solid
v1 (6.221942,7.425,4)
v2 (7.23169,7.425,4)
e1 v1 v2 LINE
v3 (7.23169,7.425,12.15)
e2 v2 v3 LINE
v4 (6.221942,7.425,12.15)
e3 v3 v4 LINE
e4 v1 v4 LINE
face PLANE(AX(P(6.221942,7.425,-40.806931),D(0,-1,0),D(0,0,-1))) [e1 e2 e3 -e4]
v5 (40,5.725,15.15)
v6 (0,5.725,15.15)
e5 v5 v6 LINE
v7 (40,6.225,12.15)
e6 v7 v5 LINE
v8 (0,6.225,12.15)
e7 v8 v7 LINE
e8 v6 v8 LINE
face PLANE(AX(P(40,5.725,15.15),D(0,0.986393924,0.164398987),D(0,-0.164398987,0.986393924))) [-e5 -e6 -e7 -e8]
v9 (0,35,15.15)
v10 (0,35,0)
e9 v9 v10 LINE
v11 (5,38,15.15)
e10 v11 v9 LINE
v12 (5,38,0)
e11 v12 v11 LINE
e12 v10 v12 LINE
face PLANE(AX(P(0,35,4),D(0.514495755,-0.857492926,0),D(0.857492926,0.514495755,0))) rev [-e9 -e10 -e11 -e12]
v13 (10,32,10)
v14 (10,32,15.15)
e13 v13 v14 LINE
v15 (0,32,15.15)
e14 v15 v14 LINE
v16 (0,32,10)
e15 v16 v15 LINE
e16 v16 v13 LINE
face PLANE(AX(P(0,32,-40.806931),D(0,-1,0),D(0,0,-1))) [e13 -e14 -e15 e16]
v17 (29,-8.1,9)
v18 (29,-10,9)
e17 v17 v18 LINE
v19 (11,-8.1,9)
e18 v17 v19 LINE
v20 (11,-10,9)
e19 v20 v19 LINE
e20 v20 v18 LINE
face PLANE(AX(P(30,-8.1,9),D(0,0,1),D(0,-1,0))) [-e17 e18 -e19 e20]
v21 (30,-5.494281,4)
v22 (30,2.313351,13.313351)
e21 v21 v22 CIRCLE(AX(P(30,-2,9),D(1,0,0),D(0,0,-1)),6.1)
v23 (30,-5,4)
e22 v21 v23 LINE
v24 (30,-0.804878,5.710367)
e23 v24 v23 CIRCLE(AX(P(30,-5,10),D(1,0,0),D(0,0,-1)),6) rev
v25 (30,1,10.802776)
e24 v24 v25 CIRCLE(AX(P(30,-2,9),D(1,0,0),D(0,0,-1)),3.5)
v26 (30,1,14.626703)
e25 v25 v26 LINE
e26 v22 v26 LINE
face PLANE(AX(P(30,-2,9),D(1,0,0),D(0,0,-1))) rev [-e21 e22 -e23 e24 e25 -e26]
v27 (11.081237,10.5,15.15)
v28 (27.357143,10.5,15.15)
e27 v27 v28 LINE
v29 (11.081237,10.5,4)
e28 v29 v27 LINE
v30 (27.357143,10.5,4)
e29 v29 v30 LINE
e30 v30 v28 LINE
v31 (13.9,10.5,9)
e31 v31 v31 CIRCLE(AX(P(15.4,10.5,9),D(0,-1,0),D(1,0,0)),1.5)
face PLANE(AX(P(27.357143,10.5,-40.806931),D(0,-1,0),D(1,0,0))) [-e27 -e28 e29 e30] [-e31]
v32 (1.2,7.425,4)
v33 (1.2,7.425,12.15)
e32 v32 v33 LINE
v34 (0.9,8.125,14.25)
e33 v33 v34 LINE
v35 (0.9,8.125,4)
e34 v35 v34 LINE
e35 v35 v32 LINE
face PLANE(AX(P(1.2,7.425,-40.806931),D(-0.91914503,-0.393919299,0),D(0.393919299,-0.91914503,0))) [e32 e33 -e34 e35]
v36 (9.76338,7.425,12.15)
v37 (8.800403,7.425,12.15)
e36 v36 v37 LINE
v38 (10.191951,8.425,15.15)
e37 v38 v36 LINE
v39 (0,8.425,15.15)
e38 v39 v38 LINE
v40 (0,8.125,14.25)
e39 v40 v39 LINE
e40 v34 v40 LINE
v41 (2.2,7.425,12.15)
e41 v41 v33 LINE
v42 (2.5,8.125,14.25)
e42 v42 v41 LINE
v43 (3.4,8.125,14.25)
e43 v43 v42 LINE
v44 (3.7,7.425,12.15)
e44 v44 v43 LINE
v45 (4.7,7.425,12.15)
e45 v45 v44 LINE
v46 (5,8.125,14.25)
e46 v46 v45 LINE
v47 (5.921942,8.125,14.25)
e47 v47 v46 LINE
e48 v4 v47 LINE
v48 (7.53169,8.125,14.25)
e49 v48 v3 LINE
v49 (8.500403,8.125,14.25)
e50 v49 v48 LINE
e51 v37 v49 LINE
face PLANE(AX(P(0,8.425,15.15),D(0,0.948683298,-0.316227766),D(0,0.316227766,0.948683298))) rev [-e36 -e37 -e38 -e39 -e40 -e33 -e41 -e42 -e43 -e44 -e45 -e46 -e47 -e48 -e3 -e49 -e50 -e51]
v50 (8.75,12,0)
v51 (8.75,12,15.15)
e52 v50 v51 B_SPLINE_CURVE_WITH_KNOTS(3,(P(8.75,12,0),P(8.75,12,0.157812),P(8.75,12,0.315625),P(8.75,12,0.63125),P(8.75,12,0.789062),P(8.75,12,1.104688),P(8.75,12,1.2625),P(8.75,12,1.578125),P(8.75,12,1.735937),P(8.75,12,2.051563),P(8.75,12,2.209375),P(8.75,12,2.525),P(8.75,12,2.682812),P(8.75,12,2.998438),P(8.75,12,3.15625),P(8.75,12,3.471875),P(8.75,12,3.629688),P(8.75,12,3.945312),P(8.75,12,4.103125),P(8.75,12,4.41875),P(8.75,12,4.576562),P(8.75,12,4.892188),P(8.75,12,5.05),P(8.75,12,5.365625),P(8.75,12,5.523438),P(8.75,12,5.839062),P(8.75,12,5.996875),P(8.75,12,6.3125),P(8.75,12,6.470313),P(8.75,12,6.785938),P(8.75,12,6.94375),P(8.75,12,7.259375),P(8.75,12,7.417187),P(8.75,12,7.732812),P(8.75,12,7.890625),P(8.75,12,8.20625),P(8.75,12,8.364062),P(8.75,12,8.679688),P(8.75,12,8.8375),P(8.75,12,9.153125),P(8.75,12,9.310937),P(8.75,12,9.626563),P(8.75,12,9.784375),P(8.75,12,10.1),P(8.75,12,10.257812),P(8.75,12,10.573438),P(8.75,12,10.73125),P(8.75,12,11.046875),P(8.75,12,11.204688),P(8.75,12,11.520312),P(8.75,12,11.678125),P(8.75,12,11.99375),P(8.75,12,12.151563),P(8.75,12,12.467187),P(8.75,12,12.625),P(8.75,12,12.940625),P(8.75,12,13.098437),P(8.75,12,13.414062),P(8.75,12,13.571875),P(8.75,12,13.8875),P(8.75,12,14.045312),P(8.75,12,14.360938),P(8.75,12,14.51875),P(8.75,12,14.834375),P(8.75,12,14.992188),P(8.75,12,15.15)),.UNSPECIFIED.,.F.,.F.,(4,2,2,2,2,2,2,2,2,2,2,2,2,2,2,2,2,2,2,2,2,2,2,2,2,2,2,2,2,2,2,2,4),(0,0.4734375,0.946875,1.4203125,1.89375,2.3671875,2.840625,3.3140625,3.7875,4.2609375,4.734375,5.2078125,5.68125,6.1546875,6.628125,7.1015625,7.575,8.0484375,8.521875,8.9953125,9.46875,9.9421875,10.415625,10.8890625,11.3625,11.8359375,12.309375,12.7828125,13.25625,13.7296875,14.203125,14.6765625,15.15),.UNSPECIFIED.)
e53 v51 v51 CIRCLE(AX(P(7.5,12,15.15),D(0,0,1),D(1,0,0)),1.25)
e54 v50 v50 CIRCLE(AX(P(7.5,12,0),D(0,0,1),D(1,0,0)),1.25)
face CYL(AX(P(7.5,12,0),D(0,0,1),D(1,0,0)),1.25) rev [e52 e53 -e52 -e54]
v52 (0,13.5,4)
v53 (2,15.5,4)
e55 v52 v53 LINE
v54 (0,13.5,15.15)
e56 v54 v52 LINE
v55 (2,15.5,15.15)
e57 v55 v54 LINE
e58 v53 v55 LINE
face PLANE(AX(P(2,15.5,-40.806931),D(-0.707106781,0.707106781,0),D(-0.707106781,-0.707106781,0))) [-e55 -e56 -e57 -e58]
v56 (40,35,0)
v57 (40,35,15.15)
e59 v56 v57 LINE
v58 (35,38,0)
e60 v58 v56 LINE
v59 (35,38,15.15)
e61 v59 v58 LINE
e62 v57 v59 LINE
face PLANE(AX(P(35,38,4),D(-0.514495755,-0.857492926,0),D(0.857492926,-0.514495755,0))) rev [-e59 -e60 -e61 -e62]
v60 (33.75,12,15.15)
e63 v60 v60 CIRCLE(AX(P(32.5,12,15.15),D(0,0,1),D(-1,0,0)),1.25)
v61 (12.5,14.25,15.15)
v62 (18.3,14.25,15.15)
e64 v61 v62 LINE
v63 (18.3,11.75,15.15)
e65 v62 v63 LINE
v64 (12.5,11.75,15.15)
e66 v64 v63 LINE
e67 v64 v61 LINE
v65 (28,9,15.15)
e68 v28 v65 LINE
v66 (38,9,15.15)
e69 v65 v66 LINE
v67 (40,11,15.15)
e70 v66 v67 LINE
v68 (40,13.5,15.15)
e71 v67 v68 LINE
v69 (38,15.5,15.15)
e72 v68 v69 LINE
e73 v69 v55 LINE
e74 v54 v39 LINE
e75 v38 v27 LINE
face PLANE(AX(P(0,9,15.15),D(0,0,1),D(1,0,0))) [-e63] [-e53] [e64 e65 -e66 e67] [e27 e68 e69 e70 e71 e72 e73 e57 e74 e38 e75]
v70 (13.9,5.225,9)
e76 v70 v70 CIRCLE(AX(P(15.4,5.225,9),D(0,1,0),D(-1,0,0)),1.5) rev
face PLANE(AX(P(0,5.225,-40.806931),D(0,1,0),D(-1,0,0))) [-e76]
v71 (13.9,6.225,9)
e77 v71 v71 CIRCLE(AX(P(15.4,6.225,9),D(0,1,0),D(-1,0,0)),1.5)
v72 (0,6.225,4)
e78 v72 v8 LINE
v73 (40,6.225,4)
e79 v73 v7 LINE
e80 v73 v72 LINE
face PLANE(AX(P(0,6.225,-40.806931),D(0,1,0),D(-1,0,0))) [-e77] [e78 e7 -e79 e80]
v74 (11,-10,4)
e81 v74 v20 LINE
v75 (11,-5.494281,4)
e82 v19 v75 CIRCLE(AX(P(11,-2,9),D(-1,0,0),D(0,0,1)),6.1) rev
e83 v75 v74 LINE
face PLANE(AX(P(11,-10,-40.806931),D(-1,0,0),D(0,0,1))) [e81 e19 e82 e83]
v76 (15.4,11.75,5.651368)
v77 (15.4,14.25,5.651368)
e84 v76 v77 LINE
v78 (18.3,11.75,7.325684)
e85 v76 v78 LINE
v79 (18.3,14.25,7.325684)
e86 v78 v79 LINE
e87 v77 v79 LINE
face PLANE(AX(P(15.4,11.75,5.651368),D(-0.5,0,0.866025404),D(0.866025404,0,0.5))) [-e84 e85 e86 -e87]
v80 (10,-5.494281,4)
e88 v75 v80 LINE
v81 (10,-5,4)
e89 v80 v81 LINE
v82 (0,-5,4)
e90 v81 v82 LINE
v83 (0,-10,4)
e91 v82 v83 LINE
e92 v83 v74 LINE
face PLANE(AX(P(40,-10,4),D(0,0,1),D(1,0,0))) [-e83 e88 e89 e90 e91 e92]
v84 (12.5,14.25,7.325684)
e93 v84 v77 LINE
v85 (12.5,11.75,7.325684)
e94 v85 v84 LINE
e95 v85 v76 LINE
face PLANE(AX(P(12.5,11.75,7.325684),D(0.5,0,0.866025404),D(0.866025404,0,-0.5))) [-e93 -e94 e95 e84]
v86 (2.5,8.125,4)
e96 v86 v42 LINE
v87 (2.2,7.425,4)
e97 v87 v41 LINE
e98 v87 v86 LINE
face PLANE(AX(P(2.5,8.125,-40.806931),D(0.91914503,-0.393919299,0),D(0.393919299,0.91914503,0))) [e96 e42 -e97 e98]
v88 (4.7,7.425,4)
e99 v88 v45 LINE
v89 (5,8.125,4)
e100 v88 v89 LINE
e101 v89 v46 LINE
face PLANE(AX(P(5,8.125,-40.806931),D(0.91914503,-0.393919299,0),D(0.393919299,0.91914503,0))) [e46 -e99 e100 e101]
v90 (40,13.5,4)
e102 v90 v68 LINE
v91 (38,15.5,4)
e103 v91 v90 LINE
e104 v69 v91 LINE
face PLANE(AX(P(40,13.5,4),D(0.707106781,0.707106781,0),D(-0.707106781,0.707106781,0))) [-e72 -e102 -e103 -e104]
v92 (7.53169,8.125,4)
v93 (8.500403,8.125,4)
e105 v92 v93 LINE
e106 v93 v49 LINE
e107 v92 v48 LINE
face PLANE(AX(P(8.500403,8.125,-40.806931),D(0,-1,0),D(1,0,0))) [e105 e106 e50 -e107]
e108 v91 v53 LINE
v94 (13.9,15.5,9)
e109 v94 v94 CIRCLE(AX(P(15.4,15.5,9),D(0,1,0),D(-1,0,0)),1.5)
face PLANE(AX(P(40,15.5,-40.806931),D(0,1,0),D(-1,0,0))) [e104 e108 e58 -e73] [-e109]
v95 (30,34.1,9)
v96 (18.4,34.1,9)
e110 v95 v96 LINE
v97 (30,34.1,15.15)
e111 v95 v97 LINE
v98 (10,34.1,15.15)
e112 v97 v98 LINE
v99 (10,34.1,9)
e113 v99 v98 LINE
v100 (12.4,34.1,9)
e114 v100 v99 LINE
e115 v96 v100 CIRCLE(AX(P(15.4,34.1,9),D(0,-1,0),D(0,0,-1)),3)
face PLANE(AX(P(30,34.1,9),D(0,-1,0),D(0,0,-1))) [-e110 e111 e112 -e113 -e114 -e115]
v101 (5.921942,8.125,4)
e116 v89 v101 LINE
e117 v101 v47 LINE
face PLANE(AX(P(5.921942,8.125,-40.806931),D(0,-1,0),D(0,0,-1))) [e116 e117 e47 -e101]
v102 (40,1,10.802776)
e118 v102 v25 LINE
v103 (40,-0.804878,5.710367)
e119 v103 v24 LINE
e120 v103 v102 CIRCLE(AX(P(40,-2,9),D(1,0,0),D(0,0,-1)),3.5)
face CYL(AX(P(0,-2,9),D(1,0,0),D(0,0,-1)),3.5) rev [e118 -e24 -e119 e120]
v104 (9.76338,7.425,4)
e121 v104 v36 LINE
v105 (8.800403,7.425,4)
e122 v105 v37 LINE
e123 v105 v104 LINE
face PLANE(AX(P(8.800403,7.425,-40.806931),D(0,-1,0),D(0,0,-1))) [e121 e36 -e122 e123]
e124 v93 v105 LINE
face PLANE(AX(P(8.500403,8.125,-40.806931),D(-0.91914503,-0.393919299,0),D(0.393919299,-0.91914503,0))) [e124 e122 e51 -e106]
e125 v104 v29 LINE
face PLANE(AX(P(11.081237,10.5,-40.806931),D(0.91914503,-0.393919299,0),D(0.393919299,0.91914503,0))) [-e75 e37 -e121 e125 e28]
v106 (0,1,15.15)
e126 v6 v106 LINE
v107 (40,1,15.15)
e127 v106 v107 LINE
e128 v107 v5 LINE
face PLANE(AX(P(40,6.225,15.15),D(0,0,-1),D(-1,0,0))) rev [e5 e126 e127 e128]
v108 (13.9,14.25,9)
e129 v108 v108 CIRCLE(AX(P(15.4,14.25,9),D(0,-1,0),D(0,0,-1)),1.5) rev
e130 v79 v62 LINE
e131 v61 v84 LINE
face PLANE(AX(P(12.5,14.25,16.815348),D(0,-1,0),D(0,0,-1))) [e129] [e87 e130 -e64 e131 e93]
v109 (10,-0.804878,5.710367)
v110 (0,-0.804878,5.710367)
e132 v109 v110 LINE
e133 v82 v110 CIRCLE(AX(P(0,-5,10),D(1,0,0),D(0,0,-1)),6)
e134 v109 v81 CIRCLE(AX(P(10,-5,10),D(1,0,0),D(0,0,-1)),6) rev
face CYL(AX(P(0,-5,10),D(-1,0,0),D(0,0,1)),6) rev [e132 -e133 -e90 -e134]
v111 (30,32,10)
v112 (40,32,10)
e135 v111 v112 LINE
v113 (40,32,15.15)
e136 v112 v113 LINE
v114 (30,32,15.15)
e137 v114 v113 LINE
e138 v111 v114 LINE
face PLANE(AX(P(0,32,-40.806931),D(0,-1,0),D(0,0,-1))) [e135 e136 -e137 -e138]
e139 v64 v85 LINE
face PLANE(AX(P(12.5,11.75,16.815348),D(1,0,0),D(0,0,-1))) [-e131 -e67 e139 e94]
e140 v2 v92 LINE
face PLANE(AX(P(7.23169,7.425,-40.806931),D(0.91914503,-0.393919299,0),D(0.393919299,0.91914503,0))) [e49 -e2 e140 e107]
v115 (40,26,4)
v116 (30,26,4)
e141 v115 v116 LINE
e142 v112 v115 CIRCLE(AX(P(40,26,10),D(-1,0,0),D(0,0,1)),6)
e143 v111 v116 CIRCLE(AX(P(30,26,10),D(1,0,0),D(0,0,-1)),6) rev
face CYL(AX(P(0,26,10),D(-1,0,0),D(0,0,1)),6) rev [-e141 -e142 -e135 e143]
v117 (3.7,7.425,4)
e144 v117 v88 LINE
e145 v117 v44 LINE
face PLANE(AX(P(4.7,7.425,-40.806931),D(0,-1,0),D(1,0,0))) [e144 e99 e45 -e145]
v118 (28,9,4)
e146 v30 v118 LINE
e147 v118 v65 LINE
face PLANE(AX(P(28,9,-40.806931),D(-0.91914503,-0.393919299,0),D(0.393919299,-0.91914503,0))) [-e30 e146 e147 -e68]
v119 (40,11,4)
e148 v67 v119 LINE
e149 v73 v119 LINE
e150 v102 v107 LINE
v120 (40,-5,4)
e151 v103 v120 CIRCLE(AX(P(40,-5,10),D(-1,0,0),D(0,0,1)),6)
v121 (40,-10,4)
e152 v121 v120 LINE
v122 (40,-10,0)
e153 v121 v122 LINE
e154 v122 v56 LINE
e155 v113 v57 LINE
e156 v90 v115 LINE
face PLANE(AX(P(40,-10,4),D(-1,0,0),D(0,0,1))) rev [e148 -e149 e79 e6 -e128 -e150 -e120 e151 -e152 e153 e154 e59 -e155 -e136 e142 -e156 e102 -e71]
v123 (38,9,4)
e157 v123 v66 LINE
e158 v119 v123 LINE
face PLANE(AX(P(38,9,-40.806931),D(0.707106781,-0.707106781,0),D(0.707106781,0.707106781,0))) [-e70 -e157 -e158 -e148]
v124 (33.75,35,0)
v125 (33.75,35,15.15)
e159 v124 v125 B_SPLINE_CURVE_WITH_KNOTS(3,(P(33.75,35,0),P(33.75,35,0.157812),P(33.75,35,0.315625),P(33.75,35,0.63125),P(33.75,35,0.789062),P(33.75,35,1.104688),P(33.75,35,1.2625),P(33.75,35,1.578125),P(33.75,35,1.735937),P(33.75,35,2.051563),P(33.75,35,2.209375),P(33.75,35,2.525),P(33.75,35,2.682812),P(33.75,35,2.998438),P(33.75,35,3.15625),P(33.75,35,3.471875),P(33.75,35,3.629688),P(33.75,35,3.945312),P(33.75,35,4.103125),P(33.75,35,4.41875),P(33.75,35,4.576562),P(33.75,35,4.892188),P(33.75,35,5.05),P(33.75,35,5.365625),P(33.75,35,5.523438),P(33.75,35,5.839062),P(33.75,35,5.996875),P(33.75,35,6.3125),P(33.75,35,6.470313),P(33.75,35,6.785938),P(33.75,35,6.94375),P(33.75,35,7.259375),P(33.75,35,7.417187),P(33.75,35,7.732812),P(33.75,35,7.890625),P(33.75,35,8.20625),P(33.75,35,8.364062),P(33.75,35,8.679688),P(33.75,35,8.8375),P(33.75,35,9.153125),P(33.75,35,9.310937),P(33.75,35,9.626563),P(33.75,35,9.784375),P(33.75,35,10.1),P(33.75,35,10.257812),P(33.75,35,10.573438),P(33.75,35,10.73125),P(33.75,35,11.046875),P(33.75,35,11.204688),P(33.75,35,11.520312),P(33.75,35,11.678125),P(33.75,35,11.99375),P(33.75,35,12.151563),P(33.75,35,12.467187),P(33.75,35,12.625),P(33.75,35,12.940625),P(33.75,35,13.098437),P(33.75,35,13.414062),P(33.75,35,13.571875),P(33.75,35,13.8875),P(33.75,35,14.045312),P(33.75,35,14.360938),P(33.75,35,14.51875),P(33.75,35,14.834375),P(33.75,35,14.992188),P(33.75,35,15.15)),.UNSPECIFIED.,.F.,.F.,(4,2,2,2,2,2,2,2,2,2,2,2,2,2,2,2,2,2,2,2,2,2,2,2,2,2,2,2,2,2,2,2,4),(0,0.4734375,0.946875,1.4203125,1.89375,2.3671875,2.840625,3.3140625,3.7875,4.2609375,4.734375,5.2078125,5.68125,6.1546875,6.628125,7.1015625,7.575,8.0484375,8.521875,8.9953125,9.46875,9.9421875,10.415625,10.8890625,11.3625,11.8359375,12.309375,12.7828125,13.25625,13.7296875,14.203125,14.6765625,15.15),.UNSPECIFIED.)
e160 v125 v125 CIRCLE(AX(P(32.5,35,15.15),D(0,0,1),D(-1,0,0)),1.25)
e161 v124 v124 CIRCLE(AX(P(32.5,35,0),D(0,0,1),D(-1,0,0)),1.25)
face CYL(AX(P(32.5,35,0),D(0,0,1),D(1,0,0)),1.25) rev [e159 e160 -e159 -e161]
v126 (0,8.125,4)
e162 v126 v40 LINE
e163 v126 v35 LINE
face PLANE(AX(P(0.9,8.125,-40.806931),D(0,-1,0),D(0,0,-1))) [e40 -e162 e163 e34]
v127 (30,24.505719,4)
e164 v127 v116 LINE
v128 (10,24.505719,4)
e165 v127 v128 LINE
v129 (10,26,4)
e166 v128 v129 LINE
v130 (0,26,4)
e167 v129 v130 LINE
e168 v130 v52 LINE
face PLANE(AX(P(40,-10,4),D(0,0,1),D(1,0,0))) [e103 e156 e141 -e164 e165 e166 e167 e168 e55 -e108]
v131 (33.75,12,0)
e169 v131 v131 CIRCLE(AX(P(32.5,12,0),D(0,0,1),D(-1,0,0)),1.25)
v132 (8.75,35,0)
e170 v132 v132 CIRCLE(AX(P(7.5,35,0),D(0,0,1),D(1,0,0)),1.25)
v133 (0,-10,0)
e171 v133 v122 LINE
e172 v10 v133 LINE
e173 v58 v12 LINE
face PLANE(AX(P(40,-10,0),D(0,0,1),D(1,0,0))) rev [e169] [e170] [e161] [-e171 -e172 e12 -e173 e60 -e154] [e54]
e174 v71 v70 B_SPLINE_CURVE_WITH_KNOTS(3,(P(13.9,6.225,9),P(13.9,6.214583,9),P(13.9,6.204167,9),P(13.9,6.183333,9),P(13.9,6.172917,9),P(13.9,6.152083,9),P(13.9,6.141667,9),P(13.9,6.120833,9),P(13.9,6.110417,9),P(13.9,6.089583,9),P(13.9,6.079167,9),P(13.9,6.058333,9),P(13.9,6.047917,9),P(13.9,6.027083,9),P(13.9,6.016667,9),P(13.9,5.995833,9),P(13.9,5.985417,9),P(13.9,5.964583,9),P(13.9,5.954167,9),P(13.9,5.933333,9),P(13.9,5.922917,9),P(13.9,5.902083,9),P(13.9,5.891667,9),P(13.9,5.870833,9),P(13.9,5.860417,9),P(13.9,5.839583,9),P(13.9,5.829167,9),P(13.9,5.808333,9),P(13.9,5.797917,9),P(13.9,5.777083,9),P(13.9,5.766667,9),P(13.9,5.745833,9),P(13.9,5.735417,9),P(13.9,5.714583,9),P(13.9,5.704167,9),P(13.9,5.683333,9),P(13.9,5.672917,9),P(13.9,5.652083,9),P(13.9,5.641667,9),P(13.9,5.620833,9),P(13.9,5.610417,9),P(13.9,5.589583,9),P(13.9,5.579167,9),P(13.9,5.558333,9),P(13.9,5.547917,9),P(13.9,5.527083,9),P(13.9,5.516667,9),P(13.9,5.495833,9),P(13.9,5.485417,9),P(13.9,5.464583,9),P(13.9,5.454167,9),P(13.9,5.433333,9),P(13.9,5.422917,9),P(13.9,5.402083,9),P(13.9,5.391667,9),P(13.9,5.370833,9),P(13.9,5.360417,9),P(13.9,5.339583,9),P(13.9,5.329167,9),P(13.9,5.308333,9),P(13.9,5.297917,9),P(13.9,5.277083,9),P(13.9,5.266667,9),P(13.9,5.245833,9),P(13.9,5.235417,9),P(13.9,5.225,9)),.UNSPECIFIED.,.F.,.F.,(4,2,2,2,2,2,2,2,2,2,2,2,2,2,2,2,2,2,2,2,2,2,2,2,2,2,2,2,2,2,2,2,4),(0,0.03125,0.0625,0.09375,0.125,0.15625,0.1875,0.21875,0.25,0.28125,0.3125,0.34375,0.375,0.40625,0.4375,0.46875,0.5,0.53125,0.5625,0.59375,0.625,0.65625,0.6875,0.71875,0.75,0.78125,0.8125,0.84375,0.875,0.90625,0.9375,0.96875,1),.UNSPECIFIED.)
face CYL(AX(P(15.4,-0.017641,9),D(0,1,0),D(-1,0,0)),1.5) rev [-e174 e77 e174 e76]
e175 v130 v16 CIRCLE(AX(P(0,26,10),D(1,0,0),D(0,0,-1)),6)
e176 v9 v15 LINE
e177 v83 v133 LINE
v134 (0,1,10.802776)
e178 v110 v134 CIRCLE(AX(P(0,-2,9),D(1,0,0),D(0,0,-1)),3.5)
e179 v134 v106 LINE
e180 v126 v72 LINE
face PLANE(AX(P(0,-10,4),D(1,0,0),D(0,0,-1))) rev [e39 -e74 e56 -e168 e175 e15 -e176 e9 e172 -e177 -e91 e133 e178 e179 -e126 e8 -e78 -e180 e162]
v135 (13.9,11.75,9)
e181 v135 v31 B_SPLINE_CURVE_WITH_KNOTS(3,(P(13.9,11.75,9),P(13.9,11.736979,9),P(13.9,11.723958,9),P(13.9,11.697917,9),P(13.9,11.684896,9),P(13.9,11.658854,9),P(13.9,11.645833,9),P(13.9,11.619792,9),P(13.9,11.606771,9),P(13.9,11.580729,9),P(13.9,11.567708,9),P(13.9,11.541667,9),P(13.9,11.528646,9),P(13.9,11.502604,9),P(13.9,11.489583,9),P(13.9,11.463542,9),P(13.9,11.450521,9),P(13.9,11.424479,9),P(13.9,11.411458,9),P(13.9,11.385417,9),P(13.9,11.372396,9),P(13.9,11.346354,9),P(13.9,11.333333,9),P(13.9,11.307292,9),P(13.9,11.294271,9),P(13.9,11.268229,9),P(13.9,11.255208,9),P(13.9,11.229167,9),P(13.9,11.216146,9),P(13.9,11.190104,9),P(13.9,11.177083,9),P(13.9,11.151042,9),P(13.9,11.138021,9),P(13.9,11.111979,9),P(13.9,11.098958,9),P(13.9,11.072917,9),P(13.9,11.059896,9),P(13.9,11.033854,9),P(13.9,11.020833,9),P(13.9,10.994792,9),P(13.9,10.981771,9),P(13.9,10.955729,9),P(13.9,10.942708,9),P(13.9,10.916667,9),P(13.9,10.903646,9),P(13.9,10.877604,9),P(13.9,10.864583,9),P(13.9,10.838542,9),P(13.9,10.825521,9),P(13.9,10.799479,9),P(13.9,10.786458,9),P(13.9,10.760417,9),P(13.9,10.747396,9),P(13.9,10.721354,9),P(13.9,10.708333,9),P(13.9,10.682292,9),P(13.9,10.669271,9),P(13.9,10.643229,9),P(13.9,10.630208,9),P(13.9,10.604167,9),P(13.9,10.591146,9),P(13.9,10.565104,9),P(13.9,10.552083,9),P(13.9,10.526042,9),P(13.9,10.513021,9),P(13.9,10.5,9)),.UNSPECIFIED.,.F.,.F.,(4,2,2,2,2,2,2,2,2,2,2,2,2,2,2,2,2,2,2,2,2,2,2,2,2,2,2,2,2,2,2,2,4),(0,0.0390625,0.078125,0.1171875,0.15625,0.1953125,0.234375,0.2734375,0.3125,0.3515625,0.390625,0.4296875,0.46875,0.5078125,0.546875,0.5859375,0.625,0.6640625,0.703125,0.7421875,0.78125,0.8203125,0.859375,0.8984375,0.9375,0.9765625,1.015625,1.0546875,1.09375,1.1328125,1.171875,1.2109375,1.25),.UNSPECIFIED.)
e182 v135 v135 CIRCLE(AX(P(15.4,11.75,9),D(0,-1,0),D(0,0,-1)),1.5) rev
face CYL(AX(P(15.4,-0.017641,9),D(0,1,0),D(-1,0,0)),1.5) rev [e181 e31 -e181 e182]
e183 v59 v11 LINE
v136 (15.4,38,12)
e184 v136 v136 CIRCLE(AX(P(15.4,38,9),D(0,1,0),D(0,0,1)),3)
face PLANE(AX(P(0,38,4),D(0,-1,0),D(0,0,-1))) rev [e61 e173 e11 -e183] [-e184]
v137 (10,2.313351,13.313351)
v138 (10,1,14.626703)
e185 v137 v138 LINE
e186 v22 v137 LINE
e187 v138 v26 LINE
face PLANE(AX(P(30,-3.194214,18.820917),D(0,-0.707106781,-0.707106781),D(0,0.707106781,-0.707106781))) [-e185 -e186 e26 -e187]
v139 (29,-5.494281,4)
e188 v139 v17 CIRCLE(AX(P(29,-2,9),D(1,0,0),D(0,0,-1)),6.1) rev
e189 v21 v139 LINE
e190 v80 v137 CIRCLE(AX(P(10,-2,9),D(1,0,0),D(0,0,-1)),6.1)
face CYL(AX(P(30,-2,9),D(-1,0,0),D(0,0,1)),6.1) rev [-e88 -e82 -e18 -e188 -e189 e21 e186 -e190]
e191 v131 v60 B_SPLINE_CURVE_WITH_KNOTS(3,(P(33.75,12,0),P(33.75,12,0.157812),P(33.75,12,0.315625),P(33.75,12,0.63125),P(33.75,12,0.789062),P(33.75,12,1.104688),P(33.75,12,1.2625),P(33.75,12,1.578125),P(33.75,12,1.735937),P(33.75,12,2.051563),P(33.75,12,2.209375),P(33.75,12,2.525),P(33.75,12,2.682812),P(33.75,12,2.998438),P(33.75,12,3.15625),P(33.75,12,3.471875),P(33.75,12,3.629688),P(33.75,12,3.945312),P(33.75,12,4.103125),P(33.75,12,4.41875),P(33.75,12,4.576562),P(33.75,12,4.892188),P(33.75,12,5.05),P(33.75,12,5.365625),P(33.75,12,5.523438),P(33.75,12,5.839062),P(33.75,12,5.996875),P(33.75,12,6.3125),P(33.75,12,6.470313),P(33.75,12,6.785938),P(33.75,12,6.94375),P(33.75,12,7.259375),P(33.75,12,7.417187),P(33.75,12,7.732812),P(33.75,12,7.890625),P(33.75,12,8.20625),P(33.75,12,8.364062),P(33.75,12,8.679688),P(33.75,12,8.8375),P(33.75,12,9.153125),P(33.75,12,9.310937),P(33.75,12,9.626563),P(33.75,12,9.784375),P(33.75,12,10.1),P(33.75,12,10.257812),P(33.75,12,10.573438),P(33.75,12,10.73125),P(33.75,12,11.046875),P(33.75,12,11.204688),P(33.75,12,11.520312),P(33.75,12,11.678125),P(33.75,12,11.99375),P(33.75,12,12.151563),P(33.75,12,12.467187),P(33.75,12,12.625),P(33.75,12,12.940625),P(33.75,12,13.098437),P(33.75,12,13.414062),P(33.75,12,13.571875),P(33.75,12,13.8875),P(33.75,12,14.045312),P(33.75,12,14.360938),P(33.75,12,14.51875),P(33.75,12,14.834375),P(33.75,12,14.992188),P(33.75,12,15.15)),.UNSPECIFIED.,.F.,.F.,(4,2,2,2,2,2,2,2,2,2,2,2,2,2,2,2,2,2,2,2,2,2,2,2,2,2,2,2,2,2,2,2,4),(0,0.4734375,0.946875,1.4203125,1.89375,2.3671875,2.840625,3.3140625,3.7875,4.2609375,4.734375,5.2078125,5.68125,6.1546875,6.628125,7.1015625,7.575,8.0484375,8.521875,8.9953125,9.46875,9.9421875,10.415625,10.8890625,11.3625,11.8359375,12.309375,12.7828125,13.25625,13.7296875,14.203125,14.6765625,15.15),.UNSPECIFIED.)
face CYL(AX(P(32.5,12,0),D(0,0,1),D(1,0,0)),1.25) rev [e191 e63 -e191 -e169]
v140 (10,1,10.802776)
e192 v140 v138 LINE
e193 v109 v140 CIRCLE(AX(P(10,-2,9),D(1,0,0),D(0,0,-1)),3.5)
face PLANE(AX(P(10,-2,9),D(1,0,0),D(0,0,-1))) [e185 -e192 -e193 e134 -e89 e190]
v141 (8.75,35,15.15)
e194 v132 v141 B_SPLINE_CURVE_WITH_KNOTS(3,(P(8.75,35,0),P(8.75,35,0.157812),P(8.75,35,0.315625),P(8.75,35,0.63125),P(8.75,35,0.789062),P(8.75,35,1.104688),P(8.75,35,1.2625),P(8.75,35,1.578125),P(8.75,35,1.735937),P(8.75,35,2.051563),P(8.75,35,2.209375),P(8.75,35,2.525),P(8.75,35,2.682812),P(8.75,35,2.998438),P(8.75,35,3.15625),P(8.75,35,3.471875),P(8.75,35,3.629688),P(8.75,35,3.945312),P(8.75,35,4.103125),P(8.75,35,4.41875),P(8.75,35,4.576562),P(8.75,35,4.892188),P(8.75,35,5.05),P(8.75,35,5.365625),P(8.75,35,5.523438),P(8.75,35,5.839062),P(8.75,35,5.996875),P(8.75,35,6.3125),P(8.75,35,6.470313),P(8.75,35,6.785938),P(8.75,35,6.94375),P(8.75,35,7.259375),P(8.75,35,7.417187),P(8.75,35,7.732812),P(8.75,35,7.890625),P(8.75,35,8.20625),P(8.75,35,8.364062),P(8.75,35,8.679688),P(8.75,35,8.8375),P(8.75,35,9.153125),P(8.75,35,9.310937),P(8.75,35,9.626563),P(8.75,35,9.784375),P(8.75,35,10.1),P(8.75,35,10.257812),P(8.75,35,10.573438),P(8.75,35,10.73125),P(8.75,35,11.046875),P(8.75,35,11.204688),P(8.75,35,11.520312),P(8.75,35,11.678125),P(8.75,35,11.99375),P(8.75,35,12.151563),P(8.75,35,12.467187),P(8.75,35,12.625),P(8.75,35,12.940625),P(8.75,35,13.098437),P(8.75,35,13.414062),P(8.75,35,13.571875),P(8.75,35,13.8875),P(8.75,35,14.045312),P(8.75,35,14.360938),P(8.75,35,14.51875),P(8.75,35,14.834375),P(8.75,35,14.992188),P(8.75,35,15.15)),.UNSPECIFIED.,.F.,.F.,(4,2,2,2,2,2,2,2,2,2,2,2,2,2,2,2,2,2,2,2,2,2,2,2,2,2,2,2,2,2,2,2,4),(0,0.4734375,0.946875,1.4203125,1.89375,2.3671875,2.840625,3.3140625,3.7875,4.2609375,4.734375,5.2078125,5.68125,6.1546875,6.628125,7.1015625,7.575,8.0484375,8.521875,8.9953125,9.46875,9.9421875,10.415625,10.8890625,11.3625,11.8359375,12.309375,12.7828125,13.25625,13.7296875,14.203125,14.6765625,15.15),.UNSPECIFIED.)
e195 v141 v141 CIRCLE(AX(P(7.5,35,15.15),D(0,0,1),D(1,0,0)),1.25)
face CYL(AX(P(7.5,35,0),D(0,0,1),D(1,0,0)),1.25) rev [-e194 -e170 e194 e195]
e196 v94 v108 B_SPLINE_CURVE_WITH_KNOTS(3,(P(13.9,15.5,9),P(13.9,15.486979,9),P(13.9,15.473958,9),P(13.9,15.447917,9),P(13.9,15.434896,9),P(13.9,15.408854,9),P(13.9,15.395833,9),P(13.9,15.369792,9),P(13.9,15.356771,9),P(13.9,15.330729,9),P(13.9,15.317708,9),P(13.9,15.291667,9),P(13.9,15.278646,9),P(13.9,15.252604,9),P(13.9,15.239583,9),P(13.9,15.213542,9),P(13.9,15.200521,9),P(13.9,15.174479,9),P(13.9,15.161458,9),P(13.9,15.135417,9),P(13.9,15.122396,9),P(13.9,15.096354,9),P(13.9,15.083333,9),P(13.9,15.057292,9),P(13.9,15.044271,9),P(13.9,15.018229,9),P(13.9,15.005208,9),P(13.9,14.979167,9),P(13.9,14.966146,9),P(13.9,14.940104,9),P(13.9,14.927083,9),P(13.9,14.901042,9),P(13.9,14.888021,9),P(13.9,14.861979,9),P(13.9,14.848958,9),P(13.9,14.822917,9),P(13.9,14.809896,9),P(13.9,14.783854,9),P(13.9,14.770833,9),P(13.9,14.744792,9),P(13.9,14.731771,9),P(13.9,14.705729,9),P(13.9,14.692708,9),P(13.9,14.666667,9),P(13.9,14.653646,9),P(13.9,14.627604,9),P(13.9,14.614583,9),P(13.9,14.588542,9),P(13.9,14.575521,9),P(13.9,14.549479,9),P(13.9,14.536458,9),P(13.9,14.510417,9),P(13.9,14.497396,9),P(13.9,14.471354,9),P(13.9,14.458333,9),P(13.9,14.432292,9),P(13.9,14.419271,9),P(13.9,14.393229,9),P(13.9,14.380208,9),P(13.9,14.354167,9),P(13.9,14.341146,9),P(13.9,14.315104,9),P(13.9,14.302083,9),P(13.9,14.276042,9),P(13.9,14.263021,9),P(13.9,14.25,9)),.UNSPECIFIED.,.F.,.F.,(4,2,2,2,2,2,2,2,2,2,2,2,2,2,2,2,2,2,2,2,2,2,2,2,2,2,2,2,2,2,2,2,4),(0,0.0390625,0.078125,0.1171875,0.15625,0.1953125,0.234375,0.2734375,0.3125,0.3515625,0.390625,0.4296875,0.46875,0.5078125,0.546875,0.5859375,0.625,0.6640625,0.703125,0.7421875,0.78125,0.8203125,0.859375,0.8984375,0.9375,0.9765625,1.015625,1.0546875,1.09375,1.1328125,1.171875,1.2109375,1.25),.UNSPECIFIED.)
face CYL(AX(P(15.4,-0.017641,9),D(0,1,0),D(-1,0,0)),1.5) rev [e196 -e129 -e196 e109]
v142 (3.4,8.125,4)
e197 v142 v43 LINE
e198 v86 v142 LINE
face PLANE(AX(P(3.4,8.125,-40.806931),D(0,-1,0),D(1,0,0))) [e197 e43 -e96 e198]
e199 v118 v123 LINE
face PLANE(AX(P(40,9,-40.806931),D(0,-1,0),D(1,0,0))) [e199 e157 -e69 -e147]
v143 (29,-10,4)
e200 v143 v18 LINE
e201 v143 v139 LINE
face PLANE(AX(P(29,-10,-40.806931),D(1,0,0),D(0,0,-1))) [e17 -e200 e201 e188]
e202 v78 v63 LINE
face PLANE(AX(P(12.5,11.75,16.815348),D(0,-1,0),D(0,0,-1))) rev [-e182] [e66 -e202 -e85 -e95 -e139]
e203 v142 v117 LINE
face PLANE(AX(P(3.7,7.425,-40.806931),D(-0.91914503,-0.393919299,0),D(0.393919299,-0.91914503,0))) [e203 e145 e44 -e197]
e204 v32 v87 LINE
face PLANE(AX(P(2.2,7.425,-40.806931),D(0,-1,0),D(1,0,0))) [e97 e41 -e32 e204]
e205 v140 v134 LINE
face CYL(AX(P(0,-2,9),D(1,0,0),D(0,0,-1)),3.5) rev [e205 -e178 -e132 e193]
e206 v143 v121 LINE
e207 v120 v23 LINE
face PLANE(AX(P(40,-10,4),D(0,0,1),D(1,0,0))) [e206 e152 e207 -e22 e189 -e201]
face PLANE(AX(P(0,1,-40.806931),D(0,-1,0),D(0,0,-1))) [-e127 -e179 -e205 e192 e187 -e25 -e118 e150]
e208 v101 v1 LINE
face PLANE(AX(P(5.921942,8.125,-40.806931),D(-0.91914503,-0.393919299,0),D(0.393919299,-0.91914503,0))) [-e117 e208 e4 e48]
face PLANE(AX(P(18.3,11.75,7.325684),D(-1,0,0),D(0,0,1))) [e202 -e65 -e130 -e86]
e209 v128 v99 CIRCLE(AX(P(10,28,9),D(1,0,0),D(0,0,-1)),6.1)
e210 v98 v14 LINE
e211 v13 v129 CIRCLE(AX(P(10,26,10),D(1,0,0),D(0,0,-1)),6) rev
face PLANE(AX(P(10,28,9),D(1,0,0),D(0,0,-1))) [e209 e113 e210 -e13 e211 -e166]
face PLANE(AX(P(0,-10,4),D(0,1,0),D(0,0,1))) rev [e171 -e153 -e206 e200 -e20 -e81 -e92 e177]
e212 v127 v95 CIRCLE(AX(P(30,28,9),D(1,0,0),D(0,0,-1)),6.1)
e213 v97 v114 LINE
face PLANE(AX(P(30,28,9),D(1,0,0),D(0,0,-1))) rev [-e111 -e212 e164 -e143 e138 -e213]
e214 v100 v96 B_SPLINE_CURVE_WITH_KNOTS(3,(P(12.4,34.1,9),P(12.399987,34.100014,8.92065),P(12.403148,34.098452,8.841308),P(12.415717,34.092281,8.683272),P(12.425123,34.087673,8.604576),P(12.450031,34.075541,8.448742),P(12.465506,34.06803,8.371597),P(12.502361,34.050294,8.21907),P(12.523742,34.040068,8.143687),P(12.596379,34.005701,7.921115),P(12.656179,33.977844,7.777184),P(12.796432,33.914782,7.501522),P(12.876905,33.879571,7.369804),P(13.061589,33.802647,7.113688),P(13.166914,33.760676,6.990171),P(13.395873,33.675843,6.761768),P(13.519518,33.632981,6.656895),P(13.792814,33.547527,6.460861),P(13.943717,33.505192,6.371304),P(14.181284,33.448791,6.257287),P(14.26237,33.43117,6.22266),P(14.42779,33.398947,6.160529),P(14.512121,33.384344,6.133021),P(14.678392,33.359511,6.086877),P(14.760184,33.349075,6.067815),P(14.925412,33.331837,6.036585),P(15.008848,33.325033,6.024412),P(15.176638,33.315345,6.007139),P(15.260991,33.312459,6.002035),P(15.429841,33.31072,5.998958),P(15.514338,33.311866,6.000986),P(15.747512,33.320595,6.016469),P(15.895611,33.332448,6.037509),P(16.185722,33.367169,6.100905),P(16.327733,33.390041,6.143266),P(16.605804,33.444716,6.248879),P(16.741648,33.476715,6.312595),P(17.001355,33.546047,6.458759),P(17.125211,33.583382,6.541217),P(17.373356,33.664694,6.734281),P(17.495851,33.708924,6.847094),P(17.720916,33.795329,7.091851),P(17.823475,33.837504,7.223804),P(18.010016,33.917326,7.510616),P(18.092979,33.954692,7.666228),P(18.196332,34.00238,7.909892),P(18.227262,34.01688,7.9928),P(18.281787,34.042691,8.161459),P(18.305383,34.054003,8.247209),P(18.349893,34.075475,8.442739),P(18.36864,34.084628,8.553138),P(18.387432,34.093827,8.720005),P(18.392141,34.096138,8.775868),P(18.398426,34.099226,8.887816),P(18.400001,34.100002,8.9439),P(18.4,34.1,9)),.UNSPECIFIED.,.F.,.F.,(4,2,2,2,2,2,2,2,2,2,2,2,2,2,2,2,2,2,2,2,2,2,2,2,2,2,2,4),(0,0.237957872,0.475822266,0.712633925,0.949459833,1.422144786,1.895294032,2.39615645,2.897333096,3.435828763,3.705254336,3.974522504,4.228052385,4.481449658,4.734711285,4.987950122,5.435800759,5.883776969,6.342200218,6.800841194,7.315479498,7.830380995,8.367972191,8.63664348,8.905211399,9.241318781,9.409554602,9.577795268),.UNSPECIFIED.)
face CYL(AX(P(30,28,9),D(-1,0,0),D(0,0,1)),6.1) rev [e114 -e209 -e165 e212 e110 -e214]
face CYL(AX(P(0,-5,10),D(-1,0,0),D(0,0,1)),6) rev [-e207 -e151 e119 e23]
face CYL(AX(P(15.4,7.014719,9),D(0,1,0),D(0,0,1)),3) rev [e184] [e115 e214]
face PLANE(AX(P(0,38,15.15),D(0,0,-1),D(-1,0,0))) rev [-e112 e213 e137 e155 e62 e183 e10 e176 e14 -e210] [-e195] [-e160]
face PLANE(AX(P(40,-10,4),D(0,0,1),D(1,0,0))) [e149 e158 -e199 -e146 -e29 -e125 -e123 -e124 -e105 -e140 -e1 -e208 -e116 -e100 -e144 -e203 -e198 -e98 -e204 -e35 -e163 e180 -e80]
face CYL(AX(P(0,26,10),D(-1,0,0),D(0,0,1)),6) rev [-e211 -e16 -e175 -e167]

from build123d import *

# Parameters (mm, degrees)
SKETCH1_W                = 40
SKETCH1_H                = 48
BOSS_EXTRUDE1_DEPTH      = 4
BOSS_EXTRUDE2_DEPTH      = 11.15
BOSS_EXTRUDE2_DEPTH_BACK = 4
SKETCH5_W                = 40
SKETCH5_H                = 5.225
SKETCH5_W_2              = 18
SKETCH5_H_2              = 5
SKETCH5_H_3              = 6
FILLET1_DEPTH            = 40
SKETCH6_R                = 1.25
CUT_EXTRUDE4_DEPTH       = 58.214705278
CHAMFER2_SIZE            = 2
CHAMFER3_SIZE            = 3
CHAMFER3_SIZE2           = 1
CHAMFER4_SIZE            = 3
CHAMFER4_SIZE2           = 0.5
CUT_EXTRUDE6_DEPTH       = 10
CUT_EXTRUDE6_DEPTH_BACK  = 10
CUT_EXTRUDE8_REACH       = 66.292
SKETCH12_R               = 3
SKETCH13_R               = 1.5
CUT_EXTRUDE10_DEPTH      = 10.275
CUT_EXTRUDE7_DEPTH       = 1.25
CUT_EXTRUDE7_DEPTH_BACK  = 1.25
CHAMFER5_SIZE            = 5
CHAMFER5_SIZE2           = 3
CHAMFER6_SIZE            = 3
CHAMFER6_SIZE2           = 5
CUT_EXTRUDE12_DEPTH      = 46.535947422
CUT_EXTRUDE12_DEPTH_BACK = 46.535947422
SKETCH15_R               = 3.5


with BuildPart() as part:
    # Sketch1 → Boss-Extrude1 (new body)
    with BuildSketch(Plane.XY):
        with Locations((20, 14)):
            Rectangle(SKETCH1_W, SKETCH1_H)
    extrude(amount=BOSS_EXTRUDE1_DEPTH)

    # Sketch5 → Boss-Extrude2 (add, two sides: drawn at the far end of the back side and taken through both)
    with BuildSketch(Plane.XY.offset(4).offset(-BOSS_EXTRUDE2_DEPTH_BACK)):
        Polygon((0.9, 8.125), (0, 8.125), (0, 15.5), (40, 15.5), (40, 9), (28, 9), (27.357142857, 10.5), (11.081237185, 10.5), (9.763380042, 7.425), (8.800403155, 7.425), (8.500403155, 8.125), (7.531690021, 8.125), (7.231690021, 7.425), (6.221941609, 7.425), (5.921941609, 8.125), (5, 8.125), (4.7, 7.425), (3.7, 7.425), (3.4, 8.125), (2.5, 8.125), (2.2, 7.425), (1.2, 7.425), align=None)
        with Locations((20, 3.6125)):
            Rectangle(SKETCH5_W, SKETCH5_H)
        with Locations((20, -7.5)):
            Rectangle(SKETCH5_W_2, SKETCH5_H_2)
        with Locations((20, 35)):
            Rectangle(SKETCH5_W, SKETCH5_H_3)
    extrude(amount=BOSS_EXTRUDE2_DEPTH + BOSS_EXTRUDE2_DEPTH_BACK)

    # Fillet1: read off the stored shape, not the designer's step
    # Fillet1 outline → Fillet1 (add)
    with BuildSketch(Plane.YZ):
        with BuildLine():
            Line((32, 4), (32, 10))
            ThreePointArc((32, 10), (30.242640687, 5.757359313), (26, 4))
            Line((26, 4), (32, 4))
        make_face()
        with BuildLine():
            Line((1, 4), (1, 10))
            ThreePointArc((1, 10), (-0.757359313, 5.757359313), (-5, 4))
            Line((-5, 4), (1, 4))
        make_face()
    extrude(amount=FILLET1_DEPTH)

    # Sketch6 → Cut-Extrude4 (cut, through all)
    with BuildSketch(Plane.XY.offset(15.15)):
        with Locations((7.5, 35)):
            Circle(SKETCH6_R)
        with Locations((7.5, 12)):
            Circle(SKETCH6_R)
        with Locations((32.5, 35)):
            Circle(SKETCH6_R)
        with Locations((32.5, 12)):
            Circle(SKETCH6_R)
    extrude(amount=-CUT_EXTRUDE4_DEPTH, mode=Mode.SUBTRACT)

    # Chamfer2
    chamfer2_edges = [part.edges().sort_by_distance(p)[0] for p in [
        (40, 9, 9.575),
        (0, 15.5, 9.575),
        (40, 15.5, 9.575),
    ]]
    chamfer(chamfer2_edges, length=CHAMFER2_SIZE)

    # Chamfer3
    chamfer3_edges = [part.edges().sort_by_distance(p)[0] for p in [
        (4.2, 7.425, 15.15),
    ]]
    chamfer3_side = [part.faces().sort_by_distance(p)[0] for p in [
        (4.2, 7.425, 9.575),
    ]]
    chamfer(chamfer3_edges, length=CHAMFER3_SIZE, length2=CHAMFER3_SIZE2, reference=chamfer3_side[0])

    # Chamfer4
    chamfer4_edges = [part.edges().sort_by_distance(p)[0] for p in [
        (20, 6.225, 15.15),
    ]]
    chamfer4_side = [part.faces().sort_by_distance(p)[0] for p in [
        (20, 6.225, 9.575),
    ]]
    chamfer(chamfer4_edges, length=CHAMFER4_SIZE, length2=CHAMFER4_SIZE2, reference=chamfer4_side[0])

    # Sketch8 → Cut-Extrude6 (cut, two sides: drawn at the far end of the back side and taken through both)
    with BuildSketch(Plane(origin=(20, 0, 0), x_dir=(0, 0, -1), z_dir=(1, 0, 0)).offset(-CUT_EXTRUDE6_DEPTH_BACK)):
        with BuildLine():
            Line((-9, 34.1), (-18.820916768, 34.1))
            Line((-18.820916768, 34.1), (-18.820916768, 21.9))
            Line((-18.820916768, 21.9), (-9, 21.9))
            ThreePointArc((-9, 21.9), (-2.9, 28), (-9, 34.1))
        make_face()
        with BuildLine():
            Line((-18.820916768, -10.472551988), (-18.820916768, -3.194214037))
            Line((-18.820916768, -3.194214037), (-13.313351365, 2.313351365))
            ThreePointArc((-13.313351365, 2.313351365), (-3.364334852, 0.334368937), (-9, -8.1))
            Line((-9, -8.1), (-9, -10.472551988))
            Line((-9, -10.472551988), (-18.820916768, -10.472551988))
        make_face()
    extrude(amount=CUT_EXTRUDE6_DEPTH + CUT_EXTRUDE6_DEPTH_BACK, mode=Mode.SUBTRACT)

    # Cut-Extrude8: up to this face of the body (flat: up to its plane)
    cut_extrude8_end = Plane(part.part.faces().sort_by_distance((20, 15.5, 9.575))[0])
    # Sketch12 → Cut-Extrude8 (cut, up to the picked face)
    with BuildSketch(Plane(origin=(0, 38, 0), x_dir=(1, 0, 0), z_dir=(0, 1, 0)), mode=Mode.PRIVATE) as cut_extrude8_sk1:
        with Locations(Location((15.4, -9, 0), (0, 0, 270))):
            Circle(SKETCH12_R)
    cut_extrude8_tool1 = split(extrude(cut_extrude8_sk1.sketch, amount=-CUT_EXTRUDE8_REACH, mode=Mode.PRIVATE), bisect_by=cut_extrude8_end, keep=Keep.BOTH, mode=Mode.PRIVATE)
    add(cut_extrude8_tool1.solids().sort_by(Axis((15.4, 38, 9), (0, -1, 0)))[0], mode=Mode.SUBTRACT)

    # Sketch13 → Cut-Extrude10 (cut)
    with BuildSketch(Plane(origin=(0, 15.5, 0), x_dir=(1, 0, 0), z_dir=(0, 1, 0))):
        with Locations(Location((15.4, -9, 0), (0, 0, 180))):
            Circle(SKETCH13_R)
    extrude(amount=-CUT_EXTRUDE10_DEPTH, mode=Mode.SUBTRACT)

    # Sketch9 → Cut-Extrude7 (cut, two sides: drawn at the far end of the back side and taken through both)
    with BuildSketch(Plane.XZ.offset(-13).offset(-CUT_EXTRUDE7_DEPTH_BACK)):
        Polygon((12.5, 16.815347994), (18.3, 16.815347994), (18.3, 7.325684219), (15.4, 5.651368439), (12.5, 7.325684219), align=None)
    extrude(amount=CUT_EXTRUDE7_DEPTH + CUT_EXTRUDE7_DEPTH_BACK, mode=Mode.SUBTRACT)

    # Chamfer5
    chamfer5_edges = [part.edges().sort_by_distance(p)[0] for p in [
        (0, 38, 7.575),
    ]]
    chamfer5_side = [part.faces().sort_by_distance(p)[0] for p in [
        (20.225127502, 38, 7.505259415),
    ]]
    chamfer(chamfer5_edges, length=CHAMFER5_SIZE, length2=CHAMFER5_SIZE2, reference=chamfer5_side[0])

    # Chamfer6
    chamfer6_edges = [part.edges().sort_by_distance(p)[0] for p in [
        (40, 38, 7.575),
    ]]
    chamfer6_side = [part.faces().sort_by_distance(p)[0] for p in [
        (40, 5.721658913, 8.075),
    ]]
    chamfer(chamfer6_edges, length=CHAMFER6_SIZE, length2=CHAMFER6_SIZE2, reference=chamfer6_side[0])

    # Sketch15 → Cut-Extrude12 (cut, two sides: drawn at the far end of the back side and taken through both)
    with BuildSketch(Plane(origin=(20, 0, 0), x_dir=(0, 0, -1), z_dir=(1, 0, 0)).offset(-CUT_EXTRUDE12_DEPTH_BACK)):
        with Locations((-9, -2)):
            Circle(SKETCH15_R)
    extrude(amount=CUT_EXTRUDE12_DEPTH + CUT_EXTRUDE12_DEPTH_BACK, mode=Mode.SUBTRACT)


solid = part.part
